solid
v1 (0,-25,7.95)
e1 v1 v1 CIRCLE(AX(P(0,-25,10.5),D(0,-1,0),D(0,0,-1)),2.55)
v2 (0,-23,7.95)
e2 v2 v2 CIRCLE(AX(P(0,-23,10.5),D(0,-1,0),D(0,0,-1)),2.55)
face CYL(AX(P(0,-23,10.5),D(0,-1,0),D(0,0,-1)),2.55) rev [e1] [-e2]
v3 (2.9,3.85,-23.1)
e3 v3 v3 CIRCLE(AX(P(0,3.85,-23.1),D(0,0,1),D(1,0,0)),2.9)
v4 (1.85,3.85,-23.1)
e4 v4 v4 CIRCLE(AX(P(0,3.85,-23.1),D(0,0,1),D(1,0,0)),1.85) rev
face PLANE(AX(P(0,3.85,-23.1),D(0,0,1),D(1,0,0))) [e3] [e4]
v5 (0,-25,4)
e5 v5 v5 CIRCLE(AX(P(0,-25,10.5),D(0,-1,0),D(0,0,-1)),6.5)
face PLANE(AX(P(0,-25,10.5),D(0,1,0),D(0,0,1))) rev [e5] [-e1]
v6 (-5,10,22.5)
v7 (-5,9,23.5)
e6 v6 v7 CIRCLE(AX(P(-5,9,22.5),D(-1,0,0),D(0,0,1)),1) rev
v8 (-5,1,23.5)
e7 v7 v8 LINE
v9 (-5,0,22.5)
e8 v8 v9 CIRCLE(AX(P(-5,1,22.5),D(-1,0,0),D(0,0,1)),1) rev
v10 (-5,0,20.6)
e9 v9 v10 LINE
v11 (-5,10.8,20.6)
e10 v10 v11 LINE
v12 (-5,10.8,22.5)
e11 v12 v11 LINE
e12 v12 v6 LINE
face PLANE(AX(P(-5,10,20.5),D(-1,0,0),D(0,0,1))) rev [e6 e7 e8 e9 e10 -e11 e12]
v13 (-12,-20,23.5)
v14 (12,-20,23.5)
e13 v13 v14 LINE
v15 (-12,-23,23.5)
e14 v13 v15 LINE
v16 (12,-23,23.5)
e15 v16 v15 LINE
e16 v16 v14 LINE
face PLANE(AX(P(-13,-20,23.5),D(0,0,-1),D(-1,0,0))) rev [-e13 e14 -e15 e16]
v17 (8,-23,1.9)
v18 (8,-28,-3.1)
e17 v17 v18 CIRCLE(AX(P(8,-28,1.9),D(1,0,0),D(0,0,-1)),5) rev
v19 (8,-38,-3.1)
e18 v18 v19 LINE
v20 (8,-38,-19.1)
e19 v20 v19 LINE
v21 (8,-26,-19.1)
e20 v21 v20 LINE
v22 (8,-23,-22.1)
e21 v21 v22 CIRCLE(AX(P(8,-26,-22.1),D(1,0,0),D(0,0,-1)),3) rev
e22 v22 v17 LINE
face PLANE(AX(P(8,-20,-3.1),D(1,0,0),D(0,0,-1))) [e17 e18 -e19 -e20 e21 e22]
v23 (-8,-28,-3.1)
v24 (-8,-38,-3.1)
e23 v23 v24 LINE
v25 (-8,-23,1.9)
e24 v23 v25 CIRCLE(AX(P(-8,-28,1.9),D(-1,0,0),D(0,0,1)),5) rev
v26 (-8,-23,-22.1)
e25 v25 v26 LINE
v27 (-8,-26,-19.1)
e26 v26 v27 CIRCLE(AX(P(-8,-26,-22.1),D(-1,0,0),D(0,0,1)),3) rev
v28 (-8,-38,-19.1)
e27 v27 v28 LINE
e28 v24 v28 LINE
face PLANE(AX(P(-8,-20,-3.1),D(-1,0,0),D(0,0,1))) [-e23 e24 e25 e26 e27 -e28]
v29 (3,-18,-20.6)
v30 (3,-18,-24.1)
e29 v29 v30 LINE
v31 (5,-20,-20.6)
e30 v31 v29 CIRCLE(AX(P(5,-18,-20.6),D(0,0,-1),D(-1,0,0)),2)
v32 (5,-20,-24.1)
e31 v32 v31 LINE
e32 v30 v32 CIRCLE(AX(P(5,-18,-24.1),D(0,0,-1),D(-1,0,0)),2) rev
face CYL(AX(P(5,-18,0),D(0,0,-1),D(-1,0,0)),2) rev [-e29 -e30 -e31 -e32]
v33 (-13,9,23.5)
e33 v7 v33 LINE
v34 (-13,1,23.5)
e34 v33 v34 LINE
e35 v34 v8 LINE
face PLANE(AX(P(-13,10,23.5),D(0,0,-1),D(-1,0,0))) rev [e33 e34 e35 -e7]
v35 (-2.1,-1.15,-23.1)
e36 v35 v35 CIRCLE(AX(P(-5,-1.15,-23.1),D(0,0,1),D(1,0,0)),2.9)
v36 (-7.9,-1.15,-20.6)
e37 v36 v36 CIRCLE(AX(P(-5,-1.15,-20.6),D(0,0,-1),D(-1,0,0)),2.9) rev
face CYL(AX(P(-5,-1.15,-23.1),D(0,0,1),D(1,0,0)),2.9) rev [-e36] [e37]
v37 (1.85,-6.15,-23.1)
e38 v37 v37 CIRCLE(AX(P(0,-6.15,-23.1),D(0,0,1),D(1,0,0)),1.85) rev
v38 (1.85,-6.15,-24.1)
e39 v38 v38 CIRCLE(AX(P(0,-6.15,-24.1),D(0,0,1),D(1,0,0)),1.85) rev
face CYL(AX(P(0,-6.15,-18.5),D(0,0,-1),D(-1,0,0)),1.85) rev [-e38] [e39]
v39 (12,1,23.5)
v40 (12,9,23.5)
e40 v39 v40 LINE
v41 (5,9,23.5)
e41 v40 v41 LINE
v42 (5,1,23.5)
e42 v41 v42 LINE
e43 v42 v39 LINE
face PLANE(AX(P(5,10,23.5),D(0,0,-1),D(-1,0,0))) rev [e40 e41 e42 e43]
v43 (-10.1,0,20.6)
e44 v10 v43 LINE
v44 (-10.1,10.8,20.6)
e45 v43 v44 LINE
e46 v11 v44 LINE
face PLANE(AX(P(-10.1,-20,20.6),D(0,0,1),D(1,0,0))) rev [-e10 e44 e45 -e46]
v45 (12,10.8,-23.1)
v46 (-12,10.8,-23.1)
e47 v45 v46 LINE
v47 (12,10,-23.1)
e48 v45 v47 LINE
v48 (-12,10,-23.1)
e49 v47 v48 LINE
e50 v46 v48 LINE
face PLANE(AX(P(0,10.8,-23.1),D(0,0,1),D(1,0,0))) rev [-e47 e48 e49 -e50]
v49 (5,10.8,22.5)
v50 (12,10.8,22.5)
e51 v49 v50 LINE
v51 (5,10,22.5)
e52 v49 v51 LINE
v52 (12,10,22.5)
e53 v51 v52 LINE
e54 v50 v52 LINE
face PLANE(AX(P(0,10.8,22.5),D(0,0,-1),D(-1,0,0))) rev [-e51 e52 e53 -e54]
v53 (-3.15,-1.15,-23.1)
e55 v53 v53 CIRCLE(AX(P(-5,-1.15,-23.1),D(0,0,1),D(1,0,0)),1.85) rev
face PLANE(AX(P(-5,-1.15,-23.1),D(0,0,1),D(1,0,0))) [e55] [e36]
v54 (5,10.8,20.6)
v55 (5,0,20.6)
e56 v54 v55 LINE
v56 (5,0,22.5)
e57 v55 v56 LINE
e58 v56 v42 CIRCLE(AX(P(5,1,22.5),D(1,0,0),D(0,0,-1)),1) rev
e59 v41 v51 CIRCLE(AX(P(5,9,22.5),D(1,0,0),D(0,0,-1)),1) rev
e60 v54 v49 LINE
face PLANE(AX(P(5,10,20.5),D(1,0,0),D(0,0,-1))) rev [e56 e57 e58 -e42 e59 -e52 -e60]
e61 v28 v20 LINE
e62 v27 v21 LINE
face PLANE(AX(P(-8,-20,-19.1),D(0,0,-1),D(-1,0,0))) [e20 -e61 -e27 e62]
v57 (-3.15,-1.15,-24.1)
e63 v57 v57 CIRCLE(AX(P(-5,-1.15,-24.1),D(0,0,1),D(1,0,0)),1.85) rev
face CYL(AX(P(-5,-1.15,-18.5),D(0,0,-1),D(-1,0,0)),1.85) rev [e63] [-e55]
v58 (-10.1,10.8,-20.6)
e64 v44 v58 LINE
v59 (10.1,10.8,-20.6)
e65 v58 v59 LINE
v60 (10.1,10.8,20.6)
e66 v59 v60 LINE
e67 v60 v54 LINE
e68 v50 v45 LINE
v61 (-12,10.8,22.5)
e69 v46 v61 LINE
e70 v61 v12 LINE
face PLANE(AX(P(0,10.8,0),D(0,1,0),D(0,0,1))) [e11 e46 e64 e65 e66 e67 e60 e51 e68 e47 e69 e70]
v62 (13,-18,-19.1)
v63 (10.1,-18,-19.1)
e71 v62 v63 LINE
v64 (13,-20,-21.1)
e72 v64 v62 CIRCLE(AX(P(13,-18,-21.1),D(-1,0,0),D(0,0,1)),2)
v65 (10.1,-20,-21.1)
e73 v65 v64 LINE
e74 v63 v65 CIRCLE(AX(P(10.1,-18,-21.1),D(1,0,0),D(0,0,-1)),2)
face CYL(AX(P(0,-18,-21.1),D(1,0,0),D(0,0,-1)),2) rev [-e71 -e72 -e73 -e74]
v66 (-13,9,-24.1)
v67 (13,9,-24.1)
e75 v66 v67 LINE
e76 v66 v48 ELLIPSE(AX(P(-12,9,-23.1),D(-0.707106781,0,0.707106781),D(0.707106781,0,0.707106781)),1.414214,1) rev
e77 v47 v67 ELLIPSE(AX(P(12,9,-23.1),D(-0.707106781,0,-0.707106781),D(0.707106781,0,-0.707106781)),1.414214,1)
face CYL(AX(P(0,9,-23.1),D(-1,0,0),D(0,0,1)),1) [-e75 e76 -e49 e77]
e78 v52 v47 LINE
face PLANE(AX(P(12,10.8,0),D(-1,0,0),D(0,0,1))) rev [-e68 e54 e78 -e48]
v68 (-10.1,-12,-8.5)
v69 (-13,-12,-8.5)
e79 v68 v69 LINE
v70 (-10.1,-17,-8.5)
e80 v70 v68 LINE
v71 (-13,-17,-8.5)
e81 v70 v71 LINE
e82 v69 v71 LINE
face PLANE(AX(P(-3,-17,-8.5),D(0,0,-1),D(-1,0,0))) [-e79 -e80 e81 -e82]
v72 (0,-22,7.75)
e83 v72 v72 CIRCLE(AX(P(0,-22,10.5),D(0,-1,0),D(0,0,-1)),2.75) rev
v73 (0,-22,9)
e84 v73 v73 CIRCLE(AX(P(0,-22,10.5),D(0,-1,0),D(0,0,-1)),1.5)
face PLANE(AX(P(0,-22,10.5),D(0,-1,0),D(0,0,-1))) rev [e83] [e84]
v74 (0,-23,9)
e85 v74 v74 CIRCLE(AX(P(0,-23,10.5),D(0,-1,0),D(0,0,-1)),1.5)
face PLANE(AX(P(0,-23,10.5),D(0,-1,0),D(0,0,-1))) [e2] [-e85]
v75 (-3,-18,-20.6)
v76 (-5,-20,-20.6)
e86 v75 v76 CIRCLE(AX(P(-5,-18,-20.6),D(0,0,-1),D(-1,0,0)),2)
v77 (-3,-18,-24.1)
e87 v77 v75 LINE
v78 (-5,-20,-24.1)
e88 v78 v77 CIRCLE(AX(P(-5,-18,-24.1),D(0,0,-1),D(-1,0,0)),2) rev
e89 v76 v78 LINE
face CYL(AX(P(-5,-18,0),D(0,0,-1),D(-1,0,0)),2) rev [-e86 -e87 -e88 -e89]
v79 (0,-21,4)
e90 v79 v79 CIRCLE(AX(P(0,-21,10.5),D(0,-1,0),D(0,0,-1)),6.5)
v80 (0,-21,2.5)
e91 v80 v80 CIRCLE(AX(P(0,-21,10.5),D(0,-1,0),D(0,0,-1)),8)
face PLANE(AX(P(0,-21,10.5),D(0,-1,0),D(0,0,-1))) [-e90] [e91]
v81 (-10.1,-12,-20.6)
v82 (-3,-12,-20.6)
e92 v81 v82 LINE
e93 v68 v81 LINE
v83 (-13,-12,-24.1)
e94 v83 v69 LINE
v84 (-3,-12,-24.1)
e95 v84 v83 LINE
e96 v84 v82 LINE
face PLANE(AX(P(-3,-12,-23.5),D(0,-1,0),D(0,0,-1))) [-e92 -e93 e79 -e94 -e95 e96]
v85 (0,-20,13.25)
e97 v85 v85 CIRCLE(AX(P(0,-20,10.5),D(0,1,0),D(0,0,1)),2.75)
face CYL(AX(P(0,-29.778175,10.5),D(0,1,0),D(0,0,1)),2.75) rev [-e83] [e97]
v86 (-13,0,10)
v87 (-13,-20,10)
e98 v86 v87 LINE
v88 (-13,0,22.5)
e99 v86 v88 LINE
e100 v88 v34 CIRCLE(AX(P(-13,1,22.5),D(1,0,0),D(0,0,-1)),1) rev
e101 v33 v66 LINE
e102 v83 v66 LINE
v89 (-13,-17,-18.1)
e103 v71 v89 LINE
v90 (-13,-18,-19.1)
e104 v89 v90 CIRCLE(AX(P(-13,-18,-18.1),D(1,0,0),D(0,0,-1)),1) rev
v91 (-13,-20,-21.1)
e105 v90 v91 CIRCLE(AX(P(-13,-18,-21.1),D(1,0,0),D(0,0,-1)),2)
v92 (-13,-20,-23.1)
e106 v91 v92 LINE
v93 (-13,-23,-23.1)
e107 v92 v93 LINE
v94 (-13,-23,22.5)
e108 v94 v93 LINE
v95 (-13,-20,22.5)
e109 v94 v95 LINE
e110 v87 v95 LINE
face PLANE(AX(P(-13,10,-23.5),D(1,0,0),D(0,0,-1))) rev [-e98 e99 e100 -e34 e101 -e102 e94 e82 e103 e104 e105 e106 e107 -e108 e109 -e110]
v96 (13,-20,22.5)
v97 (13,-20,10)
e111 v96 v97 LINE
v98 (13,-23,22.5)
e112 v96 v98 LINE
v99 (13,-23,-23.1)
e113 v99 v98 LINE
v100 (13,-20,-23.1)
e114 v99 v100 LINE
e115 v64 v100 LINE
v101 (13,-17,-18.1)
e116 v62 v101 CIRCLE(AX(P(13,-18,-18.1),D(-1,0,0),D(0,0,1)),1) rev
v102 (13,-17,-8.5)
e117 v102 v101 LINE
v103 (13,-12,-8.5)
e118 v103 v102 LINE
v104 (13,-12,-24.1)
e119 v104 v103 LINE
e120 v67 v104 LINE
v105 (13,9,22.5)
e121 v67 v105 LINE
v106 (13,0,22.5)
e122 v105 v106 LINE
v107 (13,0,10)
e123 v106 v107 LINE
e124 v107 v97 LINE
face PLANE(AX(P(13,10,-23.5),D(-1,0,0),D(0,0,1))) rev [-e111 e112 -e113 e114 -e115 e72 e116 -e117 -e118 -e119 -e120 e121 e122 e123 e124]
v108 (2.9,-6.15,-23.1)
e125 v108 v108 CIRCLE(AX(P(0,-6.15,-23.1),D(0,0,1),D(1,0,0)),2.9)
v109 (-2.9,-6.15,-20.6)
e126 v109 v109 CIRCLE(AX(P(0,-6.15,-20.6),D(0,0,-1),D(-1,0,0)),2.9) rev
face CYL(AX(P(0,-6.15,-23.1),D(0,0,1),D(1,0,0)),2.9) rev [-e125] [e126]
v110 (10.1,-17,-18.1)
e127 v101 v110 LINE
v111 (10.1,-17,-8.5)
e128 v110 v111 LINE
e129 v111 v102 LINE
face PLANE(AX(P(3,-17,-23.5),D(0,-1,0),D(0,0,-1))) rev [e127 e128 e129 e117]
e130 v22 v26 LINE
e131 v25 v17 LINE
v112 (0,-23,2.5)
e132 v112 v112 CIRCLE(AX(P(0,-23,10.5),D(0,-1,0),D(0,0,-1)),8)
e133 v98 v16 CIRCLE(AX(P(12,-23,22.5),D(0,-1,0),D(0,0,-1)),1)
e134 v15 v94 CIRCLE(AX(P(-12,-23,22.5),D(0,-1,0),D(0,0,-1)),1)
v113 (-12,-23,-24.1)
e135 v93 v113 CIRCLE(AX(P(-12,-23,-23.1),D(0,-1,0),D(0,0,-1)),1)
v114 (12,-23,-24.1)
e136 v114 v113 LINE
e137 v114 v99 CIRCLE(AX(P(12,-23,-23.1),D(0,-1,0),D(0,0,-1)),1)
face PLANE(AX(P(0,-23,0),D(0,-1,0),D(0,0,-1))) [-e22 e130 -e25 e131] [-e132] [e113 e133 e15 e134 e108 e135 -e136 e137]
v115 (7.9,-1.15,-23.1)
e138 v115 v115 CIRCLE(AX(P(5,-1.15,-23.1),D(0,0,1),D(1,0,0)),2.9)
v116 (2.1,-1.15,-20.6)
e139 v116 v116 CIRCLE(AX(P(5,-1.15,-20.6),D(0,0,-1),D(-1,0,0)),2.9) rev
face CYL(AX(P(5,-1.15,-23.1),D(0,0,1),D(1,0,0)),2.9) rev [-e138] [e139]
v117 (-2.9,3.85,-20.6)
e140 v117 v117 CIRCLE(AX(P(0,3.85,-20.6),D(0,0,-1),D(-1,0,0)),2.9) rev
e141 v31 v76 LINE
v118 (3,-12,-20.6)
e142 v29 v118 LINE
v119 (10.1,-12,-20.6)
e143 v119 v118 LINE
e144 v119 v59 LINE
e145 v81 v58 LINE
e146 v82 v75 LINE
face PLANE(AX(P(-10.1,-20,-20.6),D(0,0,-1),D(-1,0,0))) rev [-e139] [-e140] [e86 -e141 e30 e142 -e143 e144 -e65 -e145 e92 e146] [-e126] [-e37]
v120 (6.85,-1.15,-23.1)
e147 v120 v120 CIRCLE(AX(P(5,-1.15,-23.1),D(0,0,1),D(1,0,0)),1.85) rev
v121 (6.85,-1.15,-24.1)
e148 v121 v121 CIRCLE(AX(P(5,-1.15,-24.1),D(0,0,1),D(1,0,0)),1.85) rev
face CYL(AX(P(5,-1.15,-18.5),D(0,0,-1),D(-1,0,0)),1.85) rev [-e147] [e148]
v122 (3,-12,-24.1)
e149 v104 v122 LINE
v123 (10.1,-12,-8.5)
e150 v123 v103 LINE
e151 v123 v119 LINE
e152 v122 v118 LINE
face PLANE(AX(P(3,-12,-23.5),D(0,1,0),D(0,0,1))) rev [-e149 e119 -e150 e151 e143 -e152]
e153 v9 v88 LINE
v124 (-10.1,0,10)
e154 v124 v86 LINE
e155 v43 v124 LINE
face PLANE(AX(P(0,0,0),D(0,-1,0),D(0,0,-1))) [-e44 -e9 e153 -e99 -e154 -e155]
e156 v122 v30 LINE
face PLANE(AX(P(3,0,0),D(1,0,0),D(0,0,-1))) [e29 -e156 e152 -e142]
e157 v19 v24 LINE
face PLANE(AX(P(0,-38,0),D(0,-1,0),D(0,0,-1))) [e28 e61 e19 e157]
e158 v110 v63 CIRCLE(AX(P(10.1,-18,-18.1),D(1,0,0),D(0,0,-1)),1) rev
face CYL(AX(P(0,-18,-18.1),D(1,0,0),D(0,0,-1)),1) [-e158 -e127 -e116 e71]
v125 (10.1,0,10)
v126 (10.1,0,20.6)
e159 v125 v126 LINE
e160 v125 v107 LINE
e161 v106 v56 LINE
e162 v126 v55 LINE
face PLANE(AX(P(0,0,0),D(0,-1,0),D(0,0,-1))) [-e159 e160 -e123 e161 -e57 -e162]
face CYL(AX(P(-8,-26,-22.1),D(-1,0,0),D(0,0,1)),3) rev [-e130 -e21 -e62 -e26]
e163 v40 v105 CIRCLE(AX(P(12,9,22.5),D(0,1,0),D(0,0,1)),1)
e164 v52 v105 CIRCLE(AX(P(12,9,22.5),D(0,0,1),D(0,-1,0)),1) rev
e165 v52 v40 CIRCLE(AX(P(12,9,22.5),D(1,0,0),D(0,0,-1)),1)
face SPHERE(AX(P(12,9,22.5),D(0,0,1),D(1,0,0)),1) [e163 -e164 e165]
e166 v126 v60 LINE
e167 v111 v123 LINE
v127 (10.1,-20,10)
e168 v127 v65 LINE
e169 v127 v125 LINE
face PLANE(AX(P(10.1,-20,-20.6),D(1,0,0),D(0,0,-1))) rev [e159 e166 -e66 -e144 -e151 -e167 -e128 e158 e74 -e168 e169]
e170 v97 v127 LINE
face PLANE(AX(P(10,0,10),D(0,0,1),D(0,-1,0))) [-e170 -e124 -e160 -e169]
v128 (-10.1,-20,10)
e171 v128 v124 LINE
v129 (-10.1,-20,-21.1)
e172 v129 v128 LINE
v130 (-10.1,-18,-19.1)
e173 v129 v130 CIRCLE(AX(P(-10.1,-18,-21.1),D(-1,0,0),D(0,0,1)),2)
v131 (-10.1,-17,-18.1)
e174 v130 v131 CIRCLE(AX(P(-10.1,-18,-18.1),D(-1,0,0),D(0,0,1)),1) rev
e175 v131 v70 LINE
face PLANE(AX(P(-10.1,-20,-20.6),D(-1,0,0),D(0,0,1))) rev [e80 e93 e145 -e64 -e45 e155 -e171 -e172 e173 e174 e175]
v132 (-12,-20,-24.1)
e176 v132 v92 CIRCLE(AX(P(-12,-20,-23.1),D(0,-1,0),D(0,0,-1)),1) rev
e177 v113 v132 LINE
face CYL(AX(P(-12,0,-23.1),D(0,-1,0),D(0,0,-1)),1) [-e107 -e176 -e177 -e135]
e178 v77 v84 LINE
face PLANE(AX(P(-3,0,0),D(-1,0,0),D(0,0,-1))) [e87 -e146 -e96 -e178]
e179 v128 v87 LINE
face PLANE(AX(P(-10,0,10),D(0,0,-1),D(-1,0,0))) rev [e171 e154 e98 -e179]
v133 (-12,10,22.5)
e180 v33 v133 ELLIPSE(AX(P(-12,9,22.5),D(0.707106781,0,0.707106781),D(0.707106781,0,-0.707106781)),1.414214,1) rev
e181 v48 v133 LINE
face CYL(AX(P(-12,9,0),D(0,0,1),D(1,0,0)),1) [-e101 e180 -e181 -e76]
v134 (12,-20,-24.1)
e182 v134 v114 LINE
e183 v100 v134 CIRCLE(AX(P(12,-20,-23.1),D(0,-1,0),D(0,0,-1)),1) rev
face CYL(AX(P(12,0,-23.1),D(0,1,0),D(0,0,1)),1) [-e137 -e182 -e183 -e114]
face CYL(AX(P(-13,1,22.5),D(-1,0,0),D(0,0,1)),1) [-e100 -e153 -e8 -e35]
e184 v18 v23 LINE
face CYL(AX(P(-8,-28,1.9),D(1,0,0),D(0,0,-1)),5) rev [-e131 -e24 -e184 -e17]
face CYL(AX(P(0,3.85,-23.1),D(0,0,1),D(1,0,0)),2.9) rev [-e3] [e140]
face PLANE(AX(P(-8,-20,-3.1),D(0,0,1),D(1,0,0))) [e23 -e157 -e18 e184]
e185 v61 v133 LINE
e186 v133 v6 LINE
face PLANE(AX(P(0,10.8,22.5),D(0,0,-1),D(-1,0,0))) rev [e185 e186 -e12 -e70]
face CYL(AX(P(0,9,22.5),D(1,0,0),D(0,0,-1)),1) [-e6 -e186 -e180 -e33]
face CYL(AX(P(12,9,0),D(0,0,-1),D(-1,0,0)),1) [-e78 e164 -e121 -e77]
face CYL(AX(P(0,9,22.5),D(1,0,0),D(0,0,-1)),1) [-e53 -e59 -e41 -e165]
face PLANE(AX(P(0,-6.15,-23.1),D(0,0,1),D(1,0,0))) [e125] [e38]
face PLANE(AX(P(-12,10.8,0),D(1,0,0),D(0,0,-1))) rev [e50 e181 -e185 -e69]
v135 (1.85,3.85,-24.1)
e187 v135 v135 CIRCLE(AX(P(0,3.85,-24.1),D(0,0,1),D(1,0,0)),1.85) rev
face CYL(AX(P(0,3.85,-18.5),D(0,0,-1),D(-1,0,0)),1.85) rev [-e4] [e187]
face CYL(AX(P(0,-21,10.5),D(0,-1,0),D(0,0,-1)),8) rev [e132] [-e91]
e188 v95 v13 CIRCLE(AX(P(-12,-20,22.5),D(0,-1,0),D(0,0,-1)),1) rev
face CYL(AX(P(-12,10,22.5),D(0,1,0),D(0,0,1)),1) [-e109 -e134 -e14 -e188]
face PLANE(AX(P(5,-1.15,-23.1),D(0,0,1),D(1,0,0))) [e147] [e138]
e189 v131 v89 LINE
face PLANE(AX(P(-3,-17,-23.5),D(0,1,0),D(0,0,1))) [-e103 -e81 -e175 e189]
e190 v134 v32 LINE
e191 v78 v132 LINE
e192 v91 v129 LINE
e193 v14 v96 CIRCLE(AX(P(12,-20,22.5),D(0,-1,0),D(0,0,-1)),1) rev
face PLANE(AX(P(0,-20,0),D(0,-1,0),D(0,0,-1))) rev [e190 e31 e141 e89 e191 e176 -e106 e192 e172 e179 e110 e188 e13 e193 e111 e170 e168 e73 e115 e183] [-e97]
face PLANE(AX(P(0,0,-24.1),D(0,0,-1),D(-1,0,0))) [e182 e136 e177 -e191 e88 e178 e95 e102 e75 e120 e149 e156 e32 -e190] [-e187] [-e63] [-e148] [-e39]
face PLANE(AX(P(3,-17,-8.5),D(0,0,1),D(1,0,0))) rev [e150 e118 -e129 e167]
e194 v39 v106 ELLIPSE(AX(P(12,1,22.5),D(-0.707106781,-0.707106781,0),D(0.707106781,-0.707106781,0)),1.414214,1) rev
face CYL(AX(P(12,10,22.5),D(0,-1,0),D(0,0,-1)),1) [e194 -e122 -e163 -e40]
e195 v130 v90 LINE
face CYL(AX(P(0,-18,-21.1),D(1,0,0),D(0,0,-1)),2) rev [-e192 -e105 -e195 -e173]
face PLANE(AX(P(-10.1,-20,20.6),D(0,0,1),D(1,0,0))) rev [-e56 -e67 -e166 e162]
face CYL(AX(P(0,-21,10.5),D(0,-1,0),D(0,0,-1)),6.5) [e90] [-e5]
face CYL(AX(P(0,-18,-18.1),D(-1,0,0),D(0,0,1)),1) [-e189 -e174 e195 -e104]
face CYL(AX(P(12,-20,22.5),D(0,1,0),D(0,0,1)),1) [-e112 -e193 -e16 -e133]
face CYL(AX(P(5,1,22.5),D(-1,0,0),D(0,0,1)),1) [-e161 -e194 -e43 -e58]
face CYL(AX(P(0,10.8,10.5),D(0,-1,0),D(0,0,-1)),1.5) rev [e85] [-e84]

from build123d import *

# Parameters (mm, degrees)
BOSS_EXTRUDE1_DEPTH       = 10
SKETCH2_W                 = 20
SKETCH2_H                 = 17
BOSS_EXTRUDE2_DEPTH       = 3
SKETCH3_W                 = 26
SKETCH3_H                 = 47
BOSS_EXTRUDE3_DEPTH       = 3
SKETCH5_R                 = 8
SKETCH5_W                 = 16
SKETCH5_H                 = 4
CUT_EXTRUDE1_DEPTH        = 41.264748851
BOSS_EXTRUDE4_DEPTH       = 26
SKETCH7_W                 = 20
SKETCH7_H                 = 10.5
CUT_EXTRUDE2_DEPTH        = 10
SKETCH9_W                 = 8
SKETCH9_H                 = 6
CUT_EXTRUDE3_DEPTH        = 10
SKETCH10_W                = 30
SKETCH10_H                = 30
BOSS_EXTRUDE5_DEPTH       = 3
SKETCH11_R                = 1.75
CUT_EXTRUDE4_DEPTH        = 5
BOSS_EXTRUDE6_START       = 3
SKETCH12_W                = 26
SKETCH12_H                = 47
SKETCH12_R                = 8
BOSS_EXTRUDE6_DEPTH       = 3
CUT_EXTRUDE5_START        = -3
SKETCH14_R                = 8
SKETCH14_W                = 16
SKETCH14_H                = 4
CUT_EXTRUDE5_DEPTH        = 3
CUT_EXTRUDE7_DEPTH        = 49.674942219
CUT_EXTRUDE7_DEPTH_BACK   = 49.674942219
BOSS_EXTRUDE7_DEPTH       = 10.7
SKETCH18_W                = 15
SKETCH18_H                = 5
CUT_EXTRUDE8_DEPTH        = 10
SKETCH21_R                = 1.85
CUT_EXTRUDE9_DEPTH        = 5
SKETCH22_R                = 2.9
CUT_EXTRUDE10_DEPTH       = 2.6
BOSS_EXTRUDE11_OUTLINE_R  = 1.85
BOSS_EXTRUDE11_DEPTH      = 0.6
SKETCH24_R                = 1.85
BOSS_EXTRUDE12_DEPTH      = 4
SKETCH25_W                = 7
SKETCH25_H                = 3
CUT_EXTRUDE11_DEPTH       = 5
SKETCH26_W                = 20.2
SKETCH26_H                = 41.2
CUT_EXTRUDE12_DEPTH       = 30
SKETCH27_W                = 0.1
SKETCH27_H                = 3
CUT_EXTRUDE13_DEPTH       = 55.440426156
SKETCH28_R                = 8
CUT_EXTRUDE14_DEPTH       = 46.250524859
SKETCH29_W                = 2.9
SKETCH29_H                = 3
CUT_EXTRUDE15_DEPTH       = 5
FILLET1_R                 = 2
FILLET2_R                 = 2
FILLET3_R                 = 1
BOSS_EXTRUDE13_START      = -5
SKETCH35_R                = 8
SKETCH35_R_2              = 2.5
BOSS_EXTRUDE13_DEPTH      = 5
BOSS_EXTRUDE14_DEPTH      = 0.8
SKETCH38_R                = 2.55
SKETCH38_R_2              = 2.5
CUT_EXTRUDE16_DEPTH       = 2
SKETCH39_R                = 2.55
SKETCH39_R_2              = 1.25
BOSS_EXTRUDE15_DEPTH      = 1
SKETCH40_R                = 8
SKETCH40_R_2              = 6.5
CUT_EXTRUDE17_DEPTH       = 4
BOSS_EXTRUDE16_DEPTH      = 15
BOSS_EXTRUDE16_DEPTH_BACK = 3
SKETCH41_W                = 16
SKETCH41_H                = 16
FILLET4_R                 = 5
FILLET5_R                 = 3
SKETCH42_W                = 4
SKETCH42_H                = 15
CUT_EXTRUDE18_DEPTH       = 52.515628697
SKETCH43_R                = 1.5
CUT_EXTRUDE19_DEPTH       = 44.5
SKETCH44_R                = 2.75
CUT_EXTRUDE20_DEPTH       = 2


# Read off the part's stored shape, not the designer's step: Boss-Extrude11
with BuildPart() as part:
    # Sketch1 → Boss-Extrude1 (new body)
    with BuildSketch(Plane(origin=(0, 0, 0), x_dir=(1, 0, 0), z_dir=(0, 1, 0))):
        Polygon((5, -23.5), (13, -23.5), (13, 23.5), (-13, 23.5), (-13, -23.5), (-5, -23.5), (-5, -20.5), (-10, -20.5), (-10, 20.5), (10, 20.5), (10, -20.5), (5, -20.5), align=None)
    extrude(amount=BOSS_EXTRUDE1_DEPTH)

    # Sketch2 → Boss-Extrude2 (add)
    with BuildSketch(Plane(origin=(13, 0, 0), x_dir=(0, 0, -1), z_dir=(1, 0, 0))):
        with Locations((0, -8.5)):
            Rectangle(SKETCH2_W, SKETCH2_H)
    boss_extrude2 = extrude(amount=-BOSS_EXTRUDE2_DEPTH)

    # Mirror1: Boss-Extrude2 across plane
    add(boss_extrude2.mirror(Plane(origin=(0, 0, 0), x_dir=(0, 0, 1), z_dir=(1, 0, 0))))

    # Sketch3 → Boss-Extrude3 (add)
    with BuildSketch(Plane.XZ.offset(17)):
        Rectangle(SKETCH3_W, SKETCH3_H)
    extrude(amount=BOSS_EXTRUDE3_DEPTH)

    # Sketch5 → Cut-Extrude1 (cut, through all)
    with BuildSketch(Plane.XZ.offset(20)):
        with Locations(Location((0, 10.5, 0), (0, 0, 270))):
            Circle(SKETCH5_R)
        with Locations((0, -6.5)):
            Rectangle(SKETCH5_W, SKETCH5_H)
        with Locations((0, -14.5)):
            Rectangle(SKETCH5_W, SKETCH5_H)
    extrude(amount=-CUT_EXTRUDE1_DEPTH, mode=Mode.SUBTRACT)

    # Sketch6 → Boss-Extrude4 (add)
    with BuildSketch(Plane(origin=(13, 0, 0), x_dir=(0, 0, -1), z_dir=(1, 0, 0))):
        Polygon((29.5, 4.35), (23.5, 4.35), (23.5, 0), (23.5, -3.65), (29.5, -3.65), align=None)
        Polygon((23.5, -3.65), (23.5, 0), (10, 0), (10, -9.3), (23.5, -9.3), align=None)
    extrude(amount=-BOSS_EXTRUDE4_DEPTH)

    # Sketch7 → Cut-Extrude2 (cut)
    with BuildSketch(Plane(origin=(0, 0, 0), x_dir=(1, 0, 0), z_dir=(0, 1, 0))):
        with Locations((0, 15.25)):
            Rectangle(SKETCH7_W, SKETCH7_H)
    extrude(amount=-CUT_EXTRUDE2_DEPTH, mode=Mode.SUBTRACT)

    # Sketch9 → Cut-Extrude3 (cut)
    with BuildSketch(Plane(origin=(0, 4.35, 0), x_dir=(1, 0, 0), z_dir=(0, 1, 0))):
        with Locations((-9, 26.5)):
            Rectangle(SKETCH9_W, SKETCH9_H)
        with Locations((9, 26.5)):
            Rectangle(SKETCH9_W, SKETCH9_H)
    extrude(amount=-CUT_EXTRUDE3_DEPTH, mode=Mode.SUBTRACT)

    # Sketch10 → Boss-Extrude5 (add)
    with BuildSketch(Plane(origin=(0, 0, -29.5), x_dir=(-1, 0, 0), z_dir=(0, 0, -1))):
        Rectangle(SKETCH10_W, SKETCH10_H)
    extrude(amount=BOSS_EXTRUDE5_DEPTH)

    # Sketch11 → Cut-Extrude4 (cut)
    with BuildSketch(Plane(origin=(0, 0, -32.5), x_dir=(-1, 0, 0), z_dir=(0, 0, -1))):
        with Locations((0, 10)):
            Circle(SKETCH11_R)
        with Locations((10, 0)):
            Circle(SKETCH11_R)
        with Locations((0, -10)):
            Circle(SKETCH11_R)
        with Locations((-10, 0)):
            Circle(SKETCH11_R)
    extrude(amount=-CUT_EXTRUDE4_DEPTH, mode=Mode.SUBTRACT)

    # Sketch12 → Boss-Extrude6 (add)
    with BuildSketch(Plane.XZ.offset(20).offset(BOSS_EXTRUDE6_START)):
        Rectangle(SKETCH12_W, SKETCH12_H)
        with Locations(Location((0, 10.5, 0), (0, 0, 270))):
            Circle(SKETCH12_R, mode=Mode.SUBTRACT)
    extrude(amount=-BOSS_EXTRUDE6_DEPTH)

    # Sketch14 → Cut-Extrude5 (cut)
    with BuildSketch(Plane(origin=(0, -17, 0), x_dir=(1, 0, 0), z_dir=(0, 1, 0)).offset(CUT_EXTRUDE5_START)):
        Polygon((13, -23.5), (13, -10), (10, -10), (10, 10), (13, 10), (13, 23.5), (-13, 23.5), (-13, 10), (-10, 10), (-10, -10), (-13, -10), (-13, -23.5), align=None)
        with Locations(Location((0, -10.5, 0), (0, 0, 90))):
            Circle(SKETCH14_R, mode=Mode.SUBTRACT)
        with Locations((0, 6.5)):
            Rectangle(SKETCH14_W, SKETCH14_H, mode=Mode.SUBTRACT)
        with Locations((0, 14.5)):
            Rectangle(SKETCH14_W, SKETCH14_H, mode=Mode.SUBTRACT)
    extrude(amount=CUT_EXTRUDE5_DEPTH, mode=Mode.SUBTRACT)

    # Sketch15 → Cut-Extrude7 (cut, two sides: drawn at the far end of the back side and taken through both)
    with BuildSketch(Plane(origin=(13, 0, 0), x_dir=(0, 0, -1), z_dir=(1, 0, 0)).offset(-CUT_EXTRUDE7_DEPTH_BACK)):
        Polygon((23.5, -9.3), (23.5, -15.243835525), (32.5, -15.243835525), (32.5, 15), (23.5, 15), (23.5, 10), align=None)
    extrude(amount=CUT_EXTRUDE7_DEPTH + CUT_EXTRUDE7_DEPTH_BACK, mode=Mode.SUBTRACT)

    # Sketch16 → Boss-Extrude7 (add)
    with BuildSketch(Plane.XZ.offset(9.3)):
        Polygon((10, -10), (10, -20.5), (-10, -20.5), (-10, -10), (-13, -10), (-13, -23.5), (13, -23.5), (13, -10), align=None)
    extrude(amount=BOSS_EXTRUDE7_DEPTH)

    # Sketch18 → Cut-Extrude8 (cut)
    with BuildSketch(Plane(origin=(13, 0, 0), x_dir=(0, 0, -1), z_dir=(1, 0, 0))):
        with Locations((16, -14.5)):
            Rectangle(SKETCH18_W, SKETCH18_H)
    cut_extrude8 = extrude(amount=-CUT_EXTRUDE8_DEPTH, mode=Mode.SUBTRACT)

    # Mirror2: Cut-Extrude8 across plane
    add(cut_extrude8.mirror(Plane(origin=(0, 0, 0), x_dir=(0, 0, 1), z_dir=(1, 0, 0))), mode=Mode.SUBTRACT)

    # Sketch21 → Cut-Extrude9 (cut)
    with BuildSketch(Plane(origin=(0, 0, -23.5), x_dir=(-1, 0, 0), z_dir=(0, 0, -1))):
        with Locations((-5, -1.15)):
            Circle(SKETCH21_R)
        with Locations((0, 3.85)):
            Circle(SKETCH21_R)
        with Locations((5, -1.15)):
            Circle(SKETCH21_R)
        with Locations((0, -6.15)):
            Circle(SKETCH21_R)
    extrude(amount=-CUT_EXTRUDE9_DEPTH, mode=Mode.SUBTRACT)

    # Sketch22 → Cut-Extrude10 (cut)
    with BuildSketch(Plane.XY.offset(-20.5)):
        with Locations((0, 3.85)):
            Circle(SKETCH22_R)
        with Locations((5, -1.15)):
            Circle(SKETCH22_R)
        with Locations((0, -6.15)):
            Circle(SKETCH22_R)
        with Locations((-5, -1.15)):
            Circle(SKETCH22_R)
    extrude(amount=-CUT_EXTRUDE10_DEPTH, mode=Mode.SUBTRACT)

    # Boss-Extrude11 outline → Boss-Extrude11 (add)
    with BuildSketch(Plane(origin=(0, 0, -23.5), x_dir=(-1, 0, 0), z_dir=(0, 0, -1))):
        Polygon((-13, -12), (-3, -12), (-3, -17), (-13, -17), (-13, -23), (13, -23), (13, -17), (3, -17), (3, -12), (13, -12), (13, 10), (-13, 10), align=None)
        with Locations((-5, -1.15)):
            Circle(BOSS_EXTRUDE11_OUTLINE_R, mode=Mode.SUBTRACT)
        with Locations((0, -6.15)):
            Circle(BOSS_EXTRUDE11_OUTLINE_R, mode=Mode.SUBTRACT)
        with Locations((5, -1.15)):
            Circle(BOSS_EXTRUDE11_OUTLINE_R, mode=Mode.SUBTRACT)
        with Locations((0, 3.85)):
            Circle(BOSS_EXTRUDE11_OUTLINE_R, mode=Mode.SUBTRACT)
    extrude(amount=BOSS_EXTRUDE11_DEPTH)

    # Sketch24 → Boss-Extrude12 (add)
    with BuildSketch(Plane(origin=(0, 0, -24.1), x_dir=(-1, 0, 0), z_dir=(0, 0, -1))):
        with BuildLine():
            ThreePointArc((-7.5, 3.35), (-6.621320344, 5.471320344), (-4.5, 6.35))
            Line((-4.5, 6.35), (4.5, 6.35))
            ThreePointArc((4.5, 6.35), (6.621320344, 5.471320344), (7.5, 3.35))
            Line((7.5, 3.35), (7.5, -5.65))
            ThreePointArc((7.5, -5.65), (6.621320344, -7.771320344), (4.5, -8.65))
            Line((4.5, -8.65), (-4.5, -8.65))
            ThreePointArc((-4.5, -8.65), (-6.621320344, -7.771320344), (-7.5, -5.65))
            Line((-7.5, -5.65), (-7.5, 3.35))
        make_face()
        with Locations((0, -6.15)):
            Circle(SKETCH24_R, mode=Mode.SUBTRACT)
        with Locations((5, -1.15)):
            Circle(SKETCH24_R, mode=Mode.SUBTRACT)
        with Locations((-5, -1.15)):
            Circle(SKETCH24_R, mode=Mode.SUBTRACT)
        with Locations((0, 3.85)):
            Circle(SKETCH24_R, mode=Mode.SUBTRACT)
    extrude(amount=BOSS_EXTRUDE12_DEPTH)

    # Sketch25 → Cut-Extrude11 (cut)
    with BuildSketch(Plane(origin=(0, 0, -24.1), x_dir=(-1, 0, 0), z_dir=(0, 0, -1))):
        with Locations((-6.5, -18.5)):
            Rectangle(SKETCH25_W, SKETCH25_H)
        with Locations((6.5, -18.5)):
            Rectangle(SKETCH25_W, SKETCH25_H)
    extrude(amount=-CUT_EXTRUDE11_DEPTH, mode=Mode.SUBTRACT)

    # Sketch26 → Cut-Extrude12 (cut)
    with BuildSketch(Plane(origin=(0, 10, 0), x_dir=(1, 0, 0), z_dir=(0, 1, 0))):
        Rectangle(SKETCH26_W, SKETCH26_H)
    extrude(amount=-CUT_EXTRUDE12_DEPTH, mode=Mode.SUBTRACT)

    # Sketch27 → Cut-Extrude13 (cut, through all)
    with BuildSketch(Plane(origin=(0, 0, -24.1), x_dir=(-1, 0, 0), z_dir=(0, 0, -1))):
        with Locations((-10.05, -18.5)):
            Rectangle(SKETCH27_W, SKETCH27_H)
        with Locations((10.05, -18.5)):
            Rectangle(SKETCH27_W, SKETCH27_H)
    extrude(amount=-CUT_EXTRUDE13_DEPTH, mode=Mode.SUBTRACT)

    # Sketch28 → Cut-Extrude14 (cut, through all)
    with BuildSketch(Plane.XZ.offset(23)):
        with Locations(Location((0, -11.1, 0), (0, 0, 270))):
            Circle(SKETCH28_R)
    extrude(amount=-CUT_EXTRUDE14_DEPTH, mode=Mode.SUBTRACT)

    # Sketch29 → Cut-Extrude15 (cut)
    with BuildSketch(Plane(origin=(0, 0, -24.1), x_dir=(-1, 0, 0), z_dir=(0, 0, -1))):
        with Locations((-11.55, -18.5)):
            Rectangle(SKETCH29_W, SKETCH29_H)
        with Locations((11.55, -18.5)):
            Rectangle(SKETCH29_W, SKETCH29_H)
    extrude(amount=-CUT_EXTRUDE15_DEPTH, mode=Mode.SUBTRACT)

    # Fillet1
    fillet1_edges = [part.edges().sort_by_distance(p)[0] for p in [
        (-3, -20, -22.35),
        (3, -20, -22.35),
    ]]
    fillet(fillet1_edges, radius=FILLET1_R)

    # Fillet2
    fillet2_edges = [part.edges().sort_by_distance(p)[0] for p in [
        (11.55, -20, -19.1),
        (-11.55, -20, -19.1),
    ]]
    fillet(fillet2_edges, radius=FILLET2_R)

    # Fillet3
    fillet3_edges = [part.edges().sort_by_distance(p)[0] for p in [
        (11.55, -17, -19.1),
        (-11.55, -17, -19.1),
        (-9, 10, 23.5),
        (-13, 10, -0.3),
        (0, 10, -24.1),
        (13, 10, -0.3),
        (9, 10, 23.5),
        (13, 5, 23.5),
        (9, 0, 23.5),
        (-9, 0, 23.5),
        (13, -21.5, -24.1),
        (-13, -21.5, -24.1),
        (-13, -21.5, 23.5),
        (13, -21.5, 23.5),
    ]]
    fillet(fillet3_edges, radius=FILLET3_R - 0.0001)  # a hair under: the kernel refuses the full size

    # Sketch35 → Boss-Extrude13 (add)
    with BuildSketch(Plane(origin=(0, -20, 0), x_dir=(1, 0, 0), z_dir=(0, 1, 0)).offset(BOSS_EXTRUDE13_START)):
        with Locations(Location((0, -10.5, 0), (0, 0, 270))):
            Circle(SKETCH35_R)
        with Locations(Location((0, -10.5, 0), (0, 0, 270))):
            Circle(SKETCH35_R_2, mode=Mode.SUBTRACT)
    extrude(amount=BOSS_EXTRUDE13_DEPTH)

    # Sketch36 → Boss-Extrude14 (add)
    with BuildSketch(Plane(origin=(0, 10, 0), x_dir=(1, 0, 0), z_dir=(0, 1, 0))):
        Polygon((12, 23.1), (-12, 23.1), (-12, -22.5), (-5, -22.5), (-5, -20.6), (-10.1, -20.6), (-10.1, 20.6), (10.1, 20.6), (10.1, -20.6), (5, -20.6), (5, -22.5), (12, -22.5), align=None)
    extrude(amount=BOSS_EXTRUDE14_DEPTH)

    # Sketch38 → Cut-Extrude16 (cut)
    with BuildSketch(Plane.XZ.offset(25)):
        with Locations(Location((0, 10.5, 0), (0, 0, 270))):
            Circle(SKETCH38_R)
        with Locations(Location((0, 10.5, 0), (0, 0, 90))):
            Circle(SKETCH38_R_2, mode=Mode.SUBTRACT)
    extrude(amount=-CUT_EXTRUDE16_DEPTH, mode=Mode.SUBTRACT)

    # Sketch39 → Boss-Extrude15 (add)
    with BuildSketch(Plane.XZ.offset(23)):
        with Locations(Location((0, 10.5, 0), (0, 0, 270))):
            Circle(SKETCH39_R)
        with Locations(Location((0, 10.5, 0), (0, 0, 270))):
            Circle(SKETCH39_R_2, mode=Mode.SUBTRACT)
    extrude(amount=-BOSS_EXTRUDE15_DEPTH)

    # Sketch40 → Cut-Extrude17 (cut)
    with BuildSketch(Plane.XZ.offset(25)):
        with Locations(Location((0, 10.5, 0), (0, 0, 270))):
            Circle(SKETCH40_R)
        with Locations(Location((0, 10.5, 0), (0, 0, 270))):
            Circle(SKETCH40_R_2, mode=Mode.SUBTRACT)
    extrude(amount=-CUT_EXTRUDE17_DEPTH, mode=Mode.SUBTRACT)

    # Sketch41 → Boss-Extrude16 (add, two sides: drawn at the far end of the back side and taken through both)
    with BuildSketch(Plane.XZ.offset(23).offset(-BOSS_EXTRUDE16_DEPTH_BACK)):
        with Locations((0, -11.1)):
            Rectangle(SKETCH41_W, SKETCH41_H)
    extrude(amount=BOSS_EXTRUDE16_DEPTH + BOSS_EXTRUDE16_DEPTH_BACK)

    # Fillet4
    fillet4_edges = [part.edges().sort_by_distance(p)[0] for p in [
        (0, -23, -3.1),
    ]]
    fillet(fillet4_edges, radius=FILLET4_R)

    # Fillet5
    fillet5_edges = [part.edges().sort_by_distance(p)[0] for p in [
        (0, -23, -19.1),
    ]]
    fillet(fillet5_edges, radius=FILLET5_R)

    # Sketch42 → Cut-Extrude18 (cut, through all)
    with BuildSketch(Plane(origin=(7.5, 0, 0), x_dir=(0, 0, -1), z_dir=(1, 0, 0))):
        with Locations((26.1, -1.15)):
            Rectangle(SKETCH42_W, SKETCH42_H)
    extrude(amount=-CUT_EXTRUDE18_DEPTH, mode=Mode.SUBTRACT)

    # Sketch43 → Cut-Extrude19 (cut, through all)
    with BuildSketch(Plane.XZ.offset(23)):
        with Locations(Location((0, 10.5, 0), (0, 0, 270))):
            Circle(SKETCH43_R)
    extrude(amount=-CUT_EXTRUDE19_DEPTH, mode=Mode.SUBTRACT)

    # Sketch44 → Cut-Extrude20 (cut)
    with BuildSketch(Plane(origin=(0, -20, 0), x_dir=(1, 0, 0), z_dir=(0, 1, 0))):
        with Locations(Location((0, -10.5, 0), (0, 0, 270))):
            Circle(SKETCH44_R)
    extrude(amount=-CUT_EXTRUDE20_DEPTH, mode=Mode.SUBTRACT)


solid = part.part
